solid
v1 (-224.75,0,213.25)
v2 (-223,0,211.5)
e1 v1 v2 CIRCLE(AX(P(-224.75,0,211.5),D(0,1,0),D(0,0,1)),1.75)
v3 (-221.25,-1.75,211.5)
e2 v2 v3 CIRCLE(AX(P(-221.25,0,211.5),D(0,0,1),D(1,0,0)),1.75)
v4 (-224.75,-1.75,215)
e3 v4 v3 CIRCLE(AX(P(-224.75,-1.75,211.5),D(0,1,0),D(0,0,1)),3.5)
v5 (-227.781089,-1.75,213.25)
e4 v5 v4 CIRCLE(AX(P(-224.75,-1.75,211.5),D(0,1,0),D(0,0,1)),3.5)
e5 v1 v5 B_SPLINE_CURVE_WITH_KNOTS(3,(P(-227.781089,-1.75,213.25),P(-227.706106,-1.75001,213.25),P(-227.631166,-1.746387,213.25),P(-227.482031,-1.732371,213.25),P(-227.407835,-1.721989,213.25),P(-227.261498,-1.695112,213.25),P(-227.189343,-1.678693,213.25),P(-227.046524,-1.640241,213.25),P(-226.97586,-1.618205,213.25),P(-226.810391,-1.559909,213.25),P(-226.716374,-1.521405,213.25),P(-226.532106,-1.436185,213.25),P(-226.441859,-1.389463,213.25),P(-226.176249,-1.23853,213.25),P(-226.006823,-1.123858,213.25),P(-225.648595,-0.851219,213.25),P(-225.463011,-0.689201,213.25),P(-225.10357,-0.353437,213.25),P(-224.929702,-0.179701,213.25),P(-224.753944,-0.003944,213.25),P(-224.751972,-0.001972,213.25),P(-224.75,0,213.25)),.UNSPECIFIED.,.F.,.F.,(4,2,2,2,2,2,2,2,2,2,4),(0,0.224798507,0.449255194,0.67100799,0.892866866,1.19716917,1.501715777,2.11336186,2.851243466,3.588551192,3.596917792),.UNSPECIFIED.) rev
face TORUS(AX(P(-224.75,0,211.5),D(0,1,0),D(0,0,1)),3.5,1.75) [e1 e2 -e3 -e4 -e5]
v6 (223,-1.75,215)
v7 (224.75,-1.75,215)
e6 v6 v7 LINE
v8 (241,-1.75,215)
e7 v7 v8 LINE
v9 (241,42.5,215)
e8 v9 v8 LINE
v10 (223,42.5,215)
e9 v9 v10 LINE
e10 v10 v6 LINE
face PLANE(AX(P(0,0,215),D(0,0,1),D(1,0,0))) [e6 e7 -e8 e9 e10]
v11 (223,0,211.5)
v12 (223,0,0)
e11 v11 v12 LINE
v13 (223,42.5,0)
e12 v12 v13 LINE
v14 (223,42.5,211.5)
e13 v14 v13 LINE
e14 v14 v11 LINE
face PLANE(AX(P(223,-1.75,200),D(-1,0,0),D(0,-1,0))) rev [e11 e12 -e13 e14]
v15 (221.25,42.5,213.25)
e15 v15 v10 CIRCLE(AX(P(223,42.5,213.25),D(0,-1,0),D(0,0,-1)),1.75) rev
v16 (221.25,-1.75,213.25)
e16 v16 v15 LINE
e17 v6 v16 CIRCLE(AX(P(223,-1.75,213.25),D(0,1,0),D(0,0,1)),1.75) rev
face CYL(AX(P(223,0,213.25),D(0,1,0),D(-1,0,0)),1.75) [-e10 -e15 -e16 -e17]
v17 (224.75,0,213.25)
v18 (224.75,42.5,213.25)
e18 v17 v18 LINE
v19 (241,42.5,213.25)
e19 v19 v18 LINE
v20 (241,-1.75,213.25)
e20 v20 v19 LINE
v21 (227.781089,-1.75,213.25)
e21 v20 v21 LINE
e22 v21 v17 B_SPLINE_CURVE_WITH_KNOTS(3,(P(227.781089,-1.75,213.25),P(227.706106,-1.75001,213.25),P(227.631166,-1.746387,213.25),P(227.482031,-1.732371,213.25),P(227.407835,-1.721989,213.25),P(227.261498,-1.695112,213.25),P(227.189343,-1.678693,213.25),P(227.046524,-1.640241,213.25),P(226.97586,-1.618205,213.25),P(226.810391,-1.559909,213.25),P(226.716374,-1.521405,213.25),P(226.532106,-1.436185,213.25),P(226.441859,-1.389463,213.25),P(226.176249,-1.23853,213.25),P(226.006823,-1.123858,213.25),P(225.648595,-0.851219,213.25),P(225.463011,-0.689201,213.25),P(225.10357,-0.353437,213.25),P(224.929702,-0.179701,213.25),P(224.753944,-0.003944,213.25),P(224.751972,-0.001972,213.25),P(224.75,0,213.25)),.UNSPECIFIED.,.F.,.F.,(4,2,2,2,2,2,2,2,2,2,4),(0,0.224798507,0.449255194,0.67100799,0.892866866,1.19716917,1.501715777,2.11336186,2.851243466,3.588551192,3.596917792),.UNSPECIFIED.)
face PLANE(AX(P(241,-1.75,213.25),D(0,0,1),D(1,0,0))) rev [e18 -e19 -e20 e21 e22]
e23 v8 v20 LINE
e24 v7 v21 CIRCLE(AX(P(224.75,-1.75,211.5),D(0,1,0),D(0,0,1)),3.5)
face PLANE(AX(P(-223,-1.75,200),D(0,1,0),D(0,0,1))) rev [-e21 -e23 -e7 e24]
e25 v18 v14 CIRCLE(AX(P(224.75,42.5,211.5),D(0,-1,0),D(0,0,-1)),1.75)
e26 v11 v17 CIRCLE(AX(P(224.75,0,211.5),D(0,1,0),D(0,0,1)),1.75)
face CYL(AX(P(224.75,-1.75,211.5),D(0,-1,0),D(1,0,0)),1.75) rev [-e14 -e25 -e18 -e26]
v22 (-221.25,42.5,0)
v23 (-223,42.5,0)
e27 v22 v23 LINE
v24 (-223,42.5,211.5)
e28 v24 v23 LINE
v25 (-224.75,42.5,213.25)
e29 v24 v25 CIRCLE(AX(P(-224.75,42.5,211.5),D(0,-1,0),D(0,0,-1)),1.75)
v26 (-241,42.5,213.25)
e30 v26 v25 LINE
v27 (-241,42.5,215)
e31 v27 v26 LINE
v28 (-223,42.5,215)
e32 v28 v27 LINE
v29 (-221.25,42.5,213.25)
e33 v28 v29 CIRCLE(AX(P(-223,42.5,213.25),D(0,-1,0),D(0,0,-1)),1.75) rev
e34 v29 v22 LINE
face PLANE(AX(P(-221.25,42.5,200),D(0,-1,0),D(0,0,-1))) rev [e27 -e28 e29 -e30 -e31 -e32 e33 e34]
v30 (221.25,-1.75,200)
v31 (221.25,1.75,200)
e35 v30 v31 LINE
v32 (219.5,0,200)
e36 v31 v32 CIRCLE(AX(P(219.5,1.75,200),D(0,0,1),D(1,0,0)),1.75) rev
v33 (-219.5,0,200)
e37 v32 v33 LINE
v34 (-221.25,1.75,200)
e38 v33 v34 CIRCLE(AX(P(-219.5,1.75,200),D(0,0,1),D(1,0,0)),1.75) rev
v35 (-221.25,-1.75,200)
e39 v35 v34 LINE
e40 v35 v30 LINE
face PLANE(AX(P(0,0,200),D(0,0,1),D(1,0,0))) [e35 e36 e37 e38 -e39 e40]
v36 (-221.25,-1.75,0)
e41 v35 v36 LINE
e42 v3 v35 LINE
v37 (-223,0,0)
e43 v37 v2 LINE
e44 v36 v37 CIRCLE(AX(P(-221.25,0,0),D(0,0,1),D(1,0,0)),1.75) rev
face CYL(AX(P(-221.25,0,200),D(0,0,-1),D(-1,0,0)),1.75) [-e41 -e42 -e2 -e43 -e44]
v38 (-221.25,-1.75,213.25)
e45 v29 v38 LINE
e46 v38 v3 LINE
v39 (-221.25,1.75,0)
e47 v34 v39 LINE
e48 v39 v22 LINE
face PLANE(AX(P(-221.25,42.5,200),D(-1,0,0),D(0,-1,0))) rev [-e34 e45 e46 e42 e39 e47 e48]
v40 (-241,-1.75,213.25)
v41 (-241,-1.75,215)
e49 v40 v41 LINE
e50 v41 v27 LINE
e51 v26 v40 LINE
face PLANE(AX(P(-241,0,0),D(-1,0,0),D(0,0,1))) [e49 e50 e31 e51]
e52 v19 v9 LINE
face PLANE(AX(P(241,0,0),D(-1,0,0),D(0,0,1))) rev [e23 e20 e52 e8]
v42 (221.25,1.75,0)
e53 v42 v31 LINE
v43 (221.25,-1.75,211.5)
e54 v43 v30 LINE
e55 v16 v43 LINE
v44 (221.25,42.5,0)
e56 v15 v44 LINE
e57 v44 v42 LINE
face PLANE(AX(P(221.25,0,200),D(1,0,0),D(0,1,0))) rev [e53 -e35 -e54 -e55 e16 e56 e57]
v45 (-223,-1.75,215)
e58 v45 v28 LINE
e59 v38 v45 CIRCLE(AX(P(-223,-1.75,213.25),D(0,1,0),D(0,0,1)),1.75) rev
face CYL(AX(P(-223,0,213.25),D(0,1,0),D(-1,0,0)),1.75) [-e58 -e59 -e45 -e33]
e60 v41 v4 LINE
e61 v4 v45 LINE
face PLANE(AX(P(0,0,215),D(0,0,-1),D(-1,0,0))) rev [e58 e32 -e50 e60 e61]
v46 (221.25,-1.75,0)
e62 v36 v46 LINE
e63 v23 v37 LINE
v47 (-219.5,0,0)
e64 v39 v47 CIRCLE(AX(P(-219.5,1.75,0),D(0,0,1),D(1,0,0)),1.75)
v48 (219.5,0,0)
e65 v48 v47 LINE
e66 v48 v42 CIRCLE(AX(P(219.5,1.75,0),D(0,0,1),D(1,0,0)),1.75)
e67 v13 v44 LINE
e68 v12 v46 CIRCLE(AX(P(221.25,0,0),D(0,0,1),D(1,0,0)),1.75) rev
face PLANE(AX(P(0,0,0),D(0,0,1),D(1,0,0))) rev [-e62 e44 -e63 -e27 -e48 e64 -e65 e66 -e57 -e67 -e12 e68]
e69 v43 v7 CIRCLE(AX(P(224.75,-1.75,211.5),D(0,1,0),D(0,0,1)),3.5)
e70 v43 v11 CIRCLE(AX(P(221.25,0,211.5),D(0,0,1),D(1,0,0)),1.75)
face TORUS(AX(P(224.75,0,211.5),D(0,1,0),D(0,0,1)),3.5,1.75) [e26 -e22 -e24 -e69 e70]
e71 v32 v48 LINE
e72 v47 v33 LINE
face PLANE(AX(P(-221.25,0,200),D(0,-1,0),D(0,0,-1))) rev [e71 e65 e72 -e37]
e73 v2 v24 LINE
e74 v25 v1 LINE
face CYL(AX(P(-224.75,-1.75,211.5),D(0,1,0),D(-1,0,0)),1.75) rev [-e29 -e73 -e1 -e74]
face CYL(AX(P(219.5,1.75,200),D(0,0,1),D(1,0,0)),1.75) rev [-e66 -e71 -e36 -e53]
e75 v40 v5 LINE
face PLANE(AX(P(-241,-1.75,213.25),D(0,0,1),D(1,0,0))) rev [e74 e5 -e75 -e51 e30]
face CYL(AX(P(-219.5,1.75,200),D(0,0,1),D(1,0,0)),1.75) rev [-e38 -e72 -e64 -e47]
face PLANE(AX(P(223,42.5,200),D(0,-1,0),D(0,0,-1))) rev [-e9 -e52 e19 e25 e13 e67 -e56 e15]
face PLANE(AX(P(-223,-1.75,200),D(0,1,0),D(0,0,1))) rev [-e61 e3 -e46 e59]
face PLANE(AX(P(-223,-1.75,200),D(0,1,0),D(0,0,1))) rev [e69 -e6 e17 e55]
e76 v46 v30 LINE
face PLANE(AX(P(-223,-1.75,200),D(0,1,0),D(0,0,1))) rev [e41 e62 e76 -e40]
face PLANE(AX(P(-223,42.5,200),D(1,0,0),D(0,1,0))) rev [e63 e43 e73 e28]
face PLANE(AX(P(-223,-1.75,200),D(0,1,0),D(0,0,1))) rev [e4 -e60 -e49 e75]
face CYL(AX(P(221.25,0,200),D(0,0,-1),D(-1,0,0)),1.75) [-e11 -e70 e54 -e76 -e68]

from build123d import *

# Parameters (mm, degrees)
BOSS_EXTRUDE1_DEPTH = 200
SKETCH2_W           = 1.75
SKETCH2_H           = 44.25
BOSS_EXTRUDE2_DEPTH = 15
SKETCH3_W           = 1.75
SKETCH3_H           = 44.25
BOSS_EXTRUDE3_DEPTH = 18
SKETCH4_W           = 1.75
SKETCH4_H           = 44.25
BOSS_EXTRUDE4_DEPTH = 18
FILLET1_R           = 1.75


with BuildPart() as part:
    # Sketch1 → Boss-Extrude1 (new body)
    with BuildSketch(Plane.XY):
        Polygon((-221.25, 0), (221.25, 0), (221.25, 42.5), (223, 42.5), (223, -1.75), (-223, -1.75), (-223, 42.5), (-221.25, 42.5), align=None)
    extrude(amount=BOSS_EXTRUDE1_DEPTH)

    # Sketch2 → Boss-Extrude2 (add)
    with BuildSketch(Plane.XY.offset(200)):
        with Locations((-222.125, 20.375)):
            Rectangle(SKETCH2_W, SKETCH2_H)
        with Locations((222.125, 20.375)):
            Rectangle(SKETCH2_W, SKETCH2_H)
    extrude(amount=BOSS_EXTRUDE2_DEPTH)

    # Sketch3 → Boss-Extrude3 (add)
    with BuildSketch(Plane(origin=(223, 0, 0), x_dir=(0, 0, -1), z_dir=(1, 0, 0))):
        with Locations((-214.125, 20.375)):
            Rectangle(SKETCH3_W, SKETCH3_H)
    extrude(amount=BOSS_EXTRUDE3_DEPTH)

    # Sketch4 → Boss-Extrude4 (add)
    with BuildSketch(Plane.ZY.offset(223)):
        with Locations((214.125, 20.375)):
            Rectangle(SKETCH4_W, SKETCH4_H)
    extrude(amount=BOSS_EXTRUDE4_DEPTH)

    # Fillet1
    # the kernel refuses this fillet: 1.75 mm, written as the material it adds along each edge
    with BuildSketch(Plane(origin=(-221.25, 0, 0), x_dir=(1, 0, 0), z_dir=(0, 0, 1))) as fillet1_piece_1:
        with BuildLine():
            CenterArc((FILLET1_R, FILLET1_R), FILLET1_R, 180, 90)
            Line((0, FILLET1_R), (0, 0))
            Line((0, 0), (FILLET1_R, 0))
        make_face()
    extrude(amount=200)
    with BuildSketch(Plane(origin=(221.25, 0, 0), x_dir=(-1, 0, 0), z_dir=(0, 0, 1))) as fillet1_piece_2:
        with BuildLine():
            CenterArc((FILLET1_R, -FILLET1_R), FILLET1_R, 90, 90)
            Line((0, -FILLET1_R), (0, 0))
            Line((0, 0), (FILLET1_R, 0))
        make_face()
    extrude(amount=200)
    with BuildSketch(Plane(origin=(223, -1.75, 213.25), x_dir=(1, 0, 0), z_dir=(0, 1, 0)), Plane(origin=(-223, -1.75, 213.25), x_dir=(0, 0, -1), z_dir=(0, 1, 0))) as fillet1_piece_3:
        with BuildLine():
            CenterArc((FILLET1_R, FILLET1_R), FILLET1_R, 180, 90)
            Line((0, FILLET1_R), (0, 0))
            Line((0, 0), (FILLET1_R, 0))
        make_face()
    extrude(amount=44.25)
    # the kernel refuses this fillet: 1.75 mm, written as the material it takes off along each edge
    with BuildSketch(Plane(origin=(-221.25, -6.125, 215), x_dir=(0, 0, -1), z_dir=(0, 1, 0))) as fillet1_2_piece_1:
        with BuildLine():
            CenterArc((FILLET1_R, FILLET1_R), FILLET1_R, 180, 90)
            Line((0, FILLET1_R), (0, 0))
            Line((0, 0), (FILLET1_R, 0))
        make_face()
    extrude(amount=53, mode=Mode.SUBTRACT)
    with BuildSketch(Plane(origin=(221.25, -6.125, 215), x_dir=(0, 0, -1), z_dir=(0, 1, 0))) as fillet1_2_piece_2:
        with BuildLine():
            CenterArc((FILLET1_R, -FILLET1_R), FILLET1_R, 90, 90)
            Line((0, -FILLET1_R), (0, 0))
            Line((0, 0), (FILLET1_R, 0))
        make_face()
    extrude(amount=53, mode=Mode.SUBTRACT)
    with BuildSketch(Plane(origin=(223, -1.75, 211.5), x_dir=(-1, 0, 0), z_dir=(0, 0, -1))) as fillet1_2_piece_3:
        with BuildLine():
            CenterArc((FILLET1_R, FILLET1_R), FILLET1_R, 180, 90)
            Line((0, FILLET1_R), (0, 0))
            Line((0, 0), (FILLET1_R, 0))
        make_face()
    extrude(amount=215.875, mode=Mode.SUBTRACT)
    with BuildSketch(Plane(origin=(-223, -1.75, 211.5), x_dir=(1, 0, 0), z_dir=(0, 0, -1))) as fillet1_2_piece_4:
        with BuildLine():
            CenterArc((FILLET1_R, -FILLET1_R), FILLET1_R, 90, 90)
            Line((0, -FILLET1_R), (0, 0))
            Line((0, 0), (FILLET1_R, 0))
        make_face()
    extrude(amount=215.875, mode=Mode.SUBTRACT)
    with BuildSketch(Plane(origin=(-224.75, -1.75, 211.5), x_dir=(1, 0, 0), z_dir=(0, 0, -1))) as fillet1_2_piece_5:
        with BuildLine():
            CenterArc((1.75 + FILLET1_R, -FILLET1_R), FILLET1_R, 90, 90)
            Line((1.75, -FILLET1_R), (1.75, 0))
            Line((1.75, 0), (1.75 + FILLET1_R, 0))
        make_face()
    revolve(axis=Axis((-224.75, -1.75, 211.5), (0, -1, 0)), revolution_arc=233.296989237, mode=Mode.SUBTRACT)
    with BuildSketch(Plane(origin=(224.75, -1.75, 211.5), x_dir=(0.5976672776328118, 0, -0.80174423929766), z_dir=(-0.80174423929766, 0, -0.5976672776328118))) as fillet1_2_piece_6:
        with BuildLine():
            CenterArc((1.75 + FILLET1_R, -FILLET1_R), FILLET1_R, 90, 90)
            Line((1.75, -FILLET1_R), (1.75, 0))
            Line((1.75, 0), (1.75 + FILLET1_R, 0))
        make_face()
    revolve(axis=Axis((224.75, -1.75, 211.5), (0, -1, 0)), revolution_arc=233.296989237, mode=Mode.SUBTRACT)


solid = part.part
